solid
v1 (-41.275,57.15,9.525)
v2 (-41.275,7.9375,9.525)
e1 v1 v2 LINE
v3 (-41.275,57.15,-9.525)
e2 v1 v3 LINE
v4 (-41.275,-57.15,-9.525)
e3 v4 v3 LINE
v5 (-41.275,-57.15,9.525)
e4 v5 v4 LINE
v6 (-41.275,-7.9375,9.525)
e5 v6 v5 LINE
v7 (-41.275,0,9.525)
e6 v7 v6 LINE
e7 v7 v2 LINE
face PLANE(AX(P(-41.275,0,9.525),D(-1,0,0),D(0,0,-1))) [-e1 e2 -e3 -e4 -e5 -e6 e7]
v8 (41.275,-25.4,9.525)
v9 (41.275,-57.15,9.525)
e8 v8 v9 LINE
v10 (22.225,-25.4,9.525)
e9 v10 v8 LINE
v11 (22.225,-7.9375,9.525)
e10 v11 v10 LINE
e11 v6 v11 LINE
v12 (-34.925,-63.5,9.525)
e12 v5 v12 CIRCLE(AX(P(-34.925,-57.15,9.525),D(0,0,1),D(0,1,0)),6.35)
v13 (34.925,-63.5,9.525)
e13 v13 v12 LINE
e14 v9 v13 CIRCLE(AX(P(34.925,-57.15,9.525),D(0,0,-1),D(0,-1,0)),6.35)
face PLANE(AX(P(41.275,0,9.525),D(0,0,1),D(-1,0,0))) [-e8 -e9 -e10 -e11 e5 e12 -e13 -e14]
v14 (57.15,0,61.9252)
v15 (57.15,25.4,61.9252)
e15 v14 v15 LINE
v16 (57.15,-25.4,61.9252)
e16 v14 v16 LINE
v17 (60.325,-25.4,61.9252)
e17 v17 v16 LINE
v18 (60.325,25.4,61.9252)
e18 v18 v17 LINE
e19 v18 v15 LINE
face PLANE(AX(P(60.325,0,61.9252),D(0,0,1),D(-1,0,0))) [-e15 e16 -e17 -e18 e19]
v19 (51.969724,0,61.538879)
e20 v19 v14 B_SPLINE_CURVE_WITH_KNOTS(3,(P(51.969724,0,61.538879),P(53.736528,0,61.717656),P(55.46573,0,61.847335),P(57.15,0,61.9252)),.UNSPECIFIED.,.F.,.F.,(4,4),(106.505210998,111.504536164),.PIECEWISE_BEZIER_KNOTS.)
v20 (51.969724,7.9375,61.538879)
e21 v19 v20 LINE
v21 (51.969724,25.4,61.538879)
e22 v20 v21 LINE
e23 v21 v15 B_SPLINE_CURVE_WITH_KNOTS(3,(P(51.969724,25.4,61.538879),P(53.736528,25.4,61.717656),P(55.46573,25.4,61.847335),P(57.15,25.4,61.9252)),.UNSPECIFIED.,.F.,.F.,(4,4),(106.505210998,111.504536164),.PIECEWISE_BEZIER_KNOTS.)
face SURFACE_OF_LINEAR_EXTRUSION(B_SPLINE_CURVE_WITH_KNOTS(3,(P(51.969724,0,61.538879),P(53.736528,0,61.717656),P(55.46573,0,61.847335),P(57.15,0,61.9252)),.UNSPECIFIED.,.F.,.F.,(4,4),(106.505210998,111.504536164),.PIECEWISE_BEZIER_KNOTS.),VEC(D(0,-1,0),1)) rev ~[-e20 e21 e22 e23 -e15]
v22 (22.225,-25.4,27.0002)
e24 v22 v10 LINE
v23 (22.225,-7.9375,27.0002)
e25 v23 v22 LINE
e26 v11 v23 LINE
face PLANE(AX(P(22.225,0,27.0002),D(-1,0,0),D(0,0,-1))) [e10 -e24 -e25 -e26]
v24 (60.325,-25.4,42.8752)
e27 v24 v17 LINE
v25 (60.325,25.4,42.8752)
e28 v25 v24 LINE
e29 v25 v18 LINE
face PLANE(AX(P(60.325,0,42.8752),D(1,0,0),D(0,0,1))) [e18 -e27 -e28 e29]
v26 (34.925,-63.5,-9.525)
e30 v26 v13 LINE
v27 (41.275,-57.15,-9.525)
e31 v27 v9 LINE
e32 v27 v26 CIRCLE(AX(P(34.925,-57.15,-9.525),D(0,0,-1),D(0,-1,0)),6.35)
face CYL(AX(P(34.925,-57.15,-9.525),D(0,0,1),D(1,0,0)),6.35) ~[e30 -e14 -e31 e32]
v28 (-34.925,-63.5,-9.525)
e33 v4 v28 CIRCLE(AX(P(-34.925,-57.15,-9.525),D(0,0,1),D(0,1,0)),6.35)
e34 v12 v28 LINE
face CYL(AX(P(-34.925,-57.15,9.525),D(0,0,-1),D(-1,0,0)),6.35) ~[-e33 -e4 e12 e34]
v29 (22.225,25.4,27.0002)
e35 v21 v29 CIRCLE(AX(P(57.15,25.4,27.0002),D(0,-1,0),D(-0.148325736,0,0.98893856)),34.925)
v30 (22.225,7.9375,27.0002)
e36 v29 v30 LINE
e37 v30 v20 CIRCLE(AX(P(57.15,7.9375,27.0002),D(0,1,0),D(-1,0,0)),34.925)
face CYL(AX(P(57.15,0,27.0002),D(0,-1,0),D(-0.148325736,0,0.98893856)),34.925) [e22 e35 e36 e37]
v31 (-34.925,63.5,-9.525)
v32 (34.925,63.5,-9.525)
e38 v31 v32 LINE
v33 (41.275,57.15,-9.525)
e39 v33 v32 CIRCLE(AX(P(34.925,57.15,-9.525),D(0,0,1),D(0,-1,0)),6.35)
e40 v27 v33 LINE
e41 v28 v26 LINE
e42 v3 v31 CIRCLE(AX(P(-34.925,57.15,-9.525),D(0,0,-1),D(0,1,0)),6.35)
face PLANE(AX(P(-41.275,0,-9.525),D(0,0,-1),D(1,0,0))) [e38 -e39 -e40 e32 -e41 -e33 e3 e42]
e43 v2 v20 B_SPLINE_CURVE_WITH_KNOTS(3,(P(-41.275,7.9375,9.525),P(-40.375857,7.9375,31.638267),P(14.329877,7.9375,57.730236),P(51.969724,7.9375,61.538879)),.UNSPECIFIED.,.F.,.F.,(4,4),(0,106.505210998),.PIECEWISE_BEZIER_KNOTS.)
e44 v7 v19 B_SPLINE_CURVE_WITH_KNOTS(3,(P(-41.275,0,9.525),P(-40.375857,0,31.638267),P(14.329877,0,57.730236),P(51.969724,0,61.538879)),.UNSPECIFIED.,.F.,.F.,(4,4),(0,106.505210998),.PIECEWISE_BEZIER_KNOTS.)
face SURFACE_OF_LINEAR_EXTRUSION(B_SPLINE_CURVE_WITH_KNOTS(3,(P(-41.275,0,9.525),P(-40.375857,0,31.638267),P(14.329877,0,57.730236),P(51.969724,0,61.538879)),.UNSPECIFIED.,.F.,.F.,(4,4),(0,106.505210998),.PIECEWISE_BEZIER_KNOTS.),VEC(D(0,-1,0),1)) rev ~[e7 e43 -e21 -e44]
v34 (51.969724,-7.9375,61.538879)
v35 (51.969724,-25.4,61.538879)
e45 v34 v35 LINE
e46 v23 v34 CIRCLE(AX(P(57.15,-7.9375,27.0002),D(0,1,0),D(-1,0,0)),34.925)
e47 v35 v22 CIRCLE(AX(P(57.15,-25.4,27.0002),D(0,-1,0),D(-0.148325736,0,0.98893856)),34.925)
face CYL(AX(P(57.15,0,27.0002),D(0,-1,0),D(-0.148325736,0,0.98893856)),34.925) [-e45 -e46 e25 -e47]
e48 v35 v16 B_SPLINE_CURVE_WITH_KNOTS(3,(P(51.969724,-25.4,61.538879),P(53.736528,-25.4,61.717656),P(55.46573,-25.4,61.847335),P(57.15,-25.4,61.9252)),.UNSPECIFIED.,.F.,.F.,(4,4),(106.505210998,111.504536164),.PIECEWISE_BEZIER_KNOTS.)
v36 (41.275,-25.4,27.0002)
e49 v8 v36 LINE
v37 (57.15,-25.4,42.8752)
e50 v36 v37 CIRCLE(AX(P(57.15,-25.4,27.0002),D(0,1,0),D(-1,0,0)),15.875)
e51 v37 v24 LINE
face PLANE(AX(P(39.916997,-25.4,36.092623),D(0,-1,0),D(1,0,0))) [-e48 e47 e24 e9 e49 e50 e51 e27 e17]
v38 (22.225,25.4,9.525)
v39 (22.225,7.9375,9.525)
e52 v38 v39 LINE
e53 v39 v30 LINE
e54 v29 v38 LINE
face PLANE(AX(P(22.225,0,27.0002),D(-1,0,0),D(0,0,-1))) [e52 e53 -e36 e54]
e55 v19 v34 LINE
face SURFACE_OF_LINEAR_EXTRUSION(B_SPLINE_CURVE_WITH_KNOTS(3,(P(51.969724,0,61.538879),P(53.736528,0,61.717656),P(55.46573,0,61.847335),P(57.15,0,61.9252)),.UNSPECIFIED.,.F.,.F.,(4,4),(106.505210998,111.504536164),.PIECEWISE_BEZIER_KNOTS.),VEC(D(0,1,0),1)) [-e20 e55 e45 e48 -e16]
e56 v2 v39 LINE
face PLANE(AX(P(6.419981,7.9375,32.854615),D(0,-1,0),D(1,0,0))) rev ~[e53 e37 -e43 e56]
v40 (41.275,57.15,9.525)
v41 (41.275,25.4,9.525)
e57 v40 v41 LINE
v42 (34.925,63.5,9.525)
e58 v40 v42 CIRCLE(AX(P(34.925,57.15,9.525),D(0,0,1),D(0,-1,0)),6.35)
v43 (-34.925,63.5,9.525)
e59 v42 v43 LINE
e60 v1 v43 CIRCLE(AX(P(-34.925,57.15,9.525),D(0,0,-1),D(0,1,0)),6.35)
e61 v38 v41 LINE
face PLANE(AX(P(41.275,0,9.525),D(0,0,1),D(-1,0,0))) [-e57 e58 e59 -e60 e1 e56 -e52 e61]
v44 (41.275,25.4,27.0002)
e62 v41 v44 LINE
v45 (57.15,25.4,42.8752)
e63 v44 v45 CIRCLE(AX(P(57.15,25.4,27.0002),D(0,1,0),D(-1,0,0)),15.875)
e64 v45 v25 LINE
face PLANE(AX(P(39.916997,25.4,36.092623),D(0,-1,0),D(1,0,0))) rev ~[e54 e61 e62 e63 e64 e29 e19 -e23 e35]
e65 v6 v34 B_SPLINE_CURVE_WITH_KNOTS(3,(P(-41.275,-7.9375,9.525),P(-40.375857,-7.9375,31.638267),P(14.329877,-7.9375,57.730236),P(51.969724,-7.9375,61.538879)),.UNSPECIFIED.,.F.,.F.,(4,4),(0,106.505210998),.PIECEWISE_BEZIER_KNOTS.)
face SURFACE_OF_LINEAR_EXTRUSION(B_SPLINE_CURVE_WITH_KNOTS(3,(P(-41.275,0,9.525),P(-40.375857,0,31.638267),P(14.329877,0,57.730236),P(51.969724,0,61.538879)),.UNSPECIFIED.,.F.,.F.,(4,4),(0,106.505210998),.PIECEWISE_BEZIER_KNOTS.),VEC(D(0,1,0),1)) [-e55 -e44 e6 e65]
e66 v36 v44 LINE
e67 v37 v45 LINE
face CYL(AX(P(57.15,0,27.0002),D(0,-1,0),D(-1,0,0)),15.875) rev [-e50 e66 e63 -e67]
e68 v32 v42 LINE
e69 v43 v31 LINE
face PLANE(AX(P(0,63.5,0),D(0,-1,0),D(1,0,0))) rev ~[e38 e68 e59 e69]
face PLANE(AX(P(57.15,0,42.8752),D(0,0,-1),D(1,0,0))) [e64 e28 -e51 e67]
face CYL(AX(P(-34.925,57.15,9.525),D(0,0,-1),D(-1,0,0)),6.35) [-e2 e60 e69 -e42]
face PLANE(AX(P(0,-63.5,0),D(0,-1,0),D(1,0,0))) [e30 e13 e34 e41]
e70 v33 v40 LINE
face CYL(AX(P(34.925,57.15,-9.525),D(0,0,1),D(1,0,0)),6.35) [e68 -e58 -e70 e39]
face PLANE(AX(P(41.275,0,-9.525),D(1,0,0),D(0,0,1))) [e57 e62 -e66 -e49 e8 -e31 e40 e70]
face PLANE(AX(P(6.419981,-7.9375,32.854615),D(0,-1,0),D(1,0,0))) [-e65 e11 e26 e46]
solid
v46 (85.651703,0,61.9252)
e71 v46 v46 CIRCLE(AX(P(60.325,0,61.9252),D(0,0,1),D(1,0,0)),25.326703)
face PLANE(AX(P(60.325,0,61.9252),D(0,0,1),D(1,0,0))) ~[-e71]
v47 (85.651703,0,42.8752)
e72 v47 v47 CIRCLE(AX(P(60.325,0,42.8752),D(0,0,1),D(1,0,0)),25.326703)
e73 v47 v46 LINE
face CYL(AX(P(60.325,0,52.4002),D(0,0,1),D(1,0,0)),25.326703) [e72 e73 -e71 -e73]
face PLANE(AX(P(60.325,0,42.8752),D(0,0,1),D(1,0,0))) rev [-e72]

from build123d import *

# Parameters (mm, degrees)
F1_DEPTH = 63.5
F2_DEPTH = 25.4
F3_DEPTH = 7.9375
F0_W     = 25.3267031789
F0_H     = 19.05
F5_R     = 6.35


with BuildPart() as f1:
    # F0 (on Front) → F1 (new body, symmetric)
    with BuildSketch(Plane.XZ):
        Polygon((41.275, -9.525), (41.275, 9.525), (22.225, 9.525), (-41.275, 9.525), (-41.275, -9.525), align=None)
    extrude(amount=F1_DEPTH, both=True)

    # F0 (on Front) → F2 (join, symmetric)
    with BuildSketch(Plane.XZ):
        with BuildLine():
            Line((57.15, 42.8752), (60.325, 42.8752))
            Line((60.325, 42.8752), (60.325, 61.9252))
            Line((60.325, 61.9252), (57.15, 61.9252))
            add(Edge.make_bspline(
                [(51.9697236695, 61.5388792182), (53.7365276643, 61.7176558789), (55.4657297476, 61.8473348481), (57.15, 61.9252)],
                knots=[106.5052109984, 106.5052109984, 106.5052109984, 106.5052109984, 111.5045361635, 111.5045361635, 111.5045361635, 111.5045361635], degree=3))
            ThreePointArc((51.9697236695, 61.5388792182), (30.6860927314, 49.7909269976), (22.225, 27.0002))
            Line((22.225, 27.0002), (22.225, 9.525))
            Line((22.225, 9.525), (41.275, 9.525))
            Line((41.275, 9.525), (41.275, 27.0002))
            ThreePointArc((41.275, 27.0002), (45.9246798487, 38.2255201513), (57.15, 42.8752))
        make_face()
    extrude(amount=F2_DEPTH, both=True)

    # F0 (on Front) → F3 (join, symmetric)
    with BuildSketch(Plane.XZ):
        with BuildLine():
            ThreePointArc((22.225, 27.0002), (30.6860927314, 49.7909269976), (51.9697236695, 61.5388792182))
            add(Edge.make_bspline(
                [(-41.275, 9.525), (-40.3758565512, 31.6382665725), (14.3298770823, 57.7302359834), (51.9697236695, 61.5388792182)],
                knots=[0, 0, 0, 0, 106.5052109984, 106.5052109984, 106.5052109984, 106.5052109984], degree=3))
            Line((-41.275, 9.525), (22.225, 9.525))
            Line((22.225, 9.525), (22.225, 27.0002))
        make_face()
    extrude(amount=F3_DEPTH, both=True)

    # F5
    f5_edges = [f1.edges().sort_by_distance(p)[0] for p in [
        (41.275, 63.5, 0),
        (41.275, -63.5, 0),
        (-41.275, -63.5, 0),
        (-41.275, 63.5, 0),
    ]]
    fillet(f5_edges, radius=F5_R)


with BuildPart() as f4:
    # F0 (on Front) → F4 (revolve)
    with BuildSketch(Plane.XZ):
        with Locations((72.9883515894, 52.4002)):
            Rectangle(F0_W, F0_H)
    revolve(axis=Axis((60.325, 0, 52.3875), (0, 0, 1)))


solid = Compound([f1.part, f4.part])
